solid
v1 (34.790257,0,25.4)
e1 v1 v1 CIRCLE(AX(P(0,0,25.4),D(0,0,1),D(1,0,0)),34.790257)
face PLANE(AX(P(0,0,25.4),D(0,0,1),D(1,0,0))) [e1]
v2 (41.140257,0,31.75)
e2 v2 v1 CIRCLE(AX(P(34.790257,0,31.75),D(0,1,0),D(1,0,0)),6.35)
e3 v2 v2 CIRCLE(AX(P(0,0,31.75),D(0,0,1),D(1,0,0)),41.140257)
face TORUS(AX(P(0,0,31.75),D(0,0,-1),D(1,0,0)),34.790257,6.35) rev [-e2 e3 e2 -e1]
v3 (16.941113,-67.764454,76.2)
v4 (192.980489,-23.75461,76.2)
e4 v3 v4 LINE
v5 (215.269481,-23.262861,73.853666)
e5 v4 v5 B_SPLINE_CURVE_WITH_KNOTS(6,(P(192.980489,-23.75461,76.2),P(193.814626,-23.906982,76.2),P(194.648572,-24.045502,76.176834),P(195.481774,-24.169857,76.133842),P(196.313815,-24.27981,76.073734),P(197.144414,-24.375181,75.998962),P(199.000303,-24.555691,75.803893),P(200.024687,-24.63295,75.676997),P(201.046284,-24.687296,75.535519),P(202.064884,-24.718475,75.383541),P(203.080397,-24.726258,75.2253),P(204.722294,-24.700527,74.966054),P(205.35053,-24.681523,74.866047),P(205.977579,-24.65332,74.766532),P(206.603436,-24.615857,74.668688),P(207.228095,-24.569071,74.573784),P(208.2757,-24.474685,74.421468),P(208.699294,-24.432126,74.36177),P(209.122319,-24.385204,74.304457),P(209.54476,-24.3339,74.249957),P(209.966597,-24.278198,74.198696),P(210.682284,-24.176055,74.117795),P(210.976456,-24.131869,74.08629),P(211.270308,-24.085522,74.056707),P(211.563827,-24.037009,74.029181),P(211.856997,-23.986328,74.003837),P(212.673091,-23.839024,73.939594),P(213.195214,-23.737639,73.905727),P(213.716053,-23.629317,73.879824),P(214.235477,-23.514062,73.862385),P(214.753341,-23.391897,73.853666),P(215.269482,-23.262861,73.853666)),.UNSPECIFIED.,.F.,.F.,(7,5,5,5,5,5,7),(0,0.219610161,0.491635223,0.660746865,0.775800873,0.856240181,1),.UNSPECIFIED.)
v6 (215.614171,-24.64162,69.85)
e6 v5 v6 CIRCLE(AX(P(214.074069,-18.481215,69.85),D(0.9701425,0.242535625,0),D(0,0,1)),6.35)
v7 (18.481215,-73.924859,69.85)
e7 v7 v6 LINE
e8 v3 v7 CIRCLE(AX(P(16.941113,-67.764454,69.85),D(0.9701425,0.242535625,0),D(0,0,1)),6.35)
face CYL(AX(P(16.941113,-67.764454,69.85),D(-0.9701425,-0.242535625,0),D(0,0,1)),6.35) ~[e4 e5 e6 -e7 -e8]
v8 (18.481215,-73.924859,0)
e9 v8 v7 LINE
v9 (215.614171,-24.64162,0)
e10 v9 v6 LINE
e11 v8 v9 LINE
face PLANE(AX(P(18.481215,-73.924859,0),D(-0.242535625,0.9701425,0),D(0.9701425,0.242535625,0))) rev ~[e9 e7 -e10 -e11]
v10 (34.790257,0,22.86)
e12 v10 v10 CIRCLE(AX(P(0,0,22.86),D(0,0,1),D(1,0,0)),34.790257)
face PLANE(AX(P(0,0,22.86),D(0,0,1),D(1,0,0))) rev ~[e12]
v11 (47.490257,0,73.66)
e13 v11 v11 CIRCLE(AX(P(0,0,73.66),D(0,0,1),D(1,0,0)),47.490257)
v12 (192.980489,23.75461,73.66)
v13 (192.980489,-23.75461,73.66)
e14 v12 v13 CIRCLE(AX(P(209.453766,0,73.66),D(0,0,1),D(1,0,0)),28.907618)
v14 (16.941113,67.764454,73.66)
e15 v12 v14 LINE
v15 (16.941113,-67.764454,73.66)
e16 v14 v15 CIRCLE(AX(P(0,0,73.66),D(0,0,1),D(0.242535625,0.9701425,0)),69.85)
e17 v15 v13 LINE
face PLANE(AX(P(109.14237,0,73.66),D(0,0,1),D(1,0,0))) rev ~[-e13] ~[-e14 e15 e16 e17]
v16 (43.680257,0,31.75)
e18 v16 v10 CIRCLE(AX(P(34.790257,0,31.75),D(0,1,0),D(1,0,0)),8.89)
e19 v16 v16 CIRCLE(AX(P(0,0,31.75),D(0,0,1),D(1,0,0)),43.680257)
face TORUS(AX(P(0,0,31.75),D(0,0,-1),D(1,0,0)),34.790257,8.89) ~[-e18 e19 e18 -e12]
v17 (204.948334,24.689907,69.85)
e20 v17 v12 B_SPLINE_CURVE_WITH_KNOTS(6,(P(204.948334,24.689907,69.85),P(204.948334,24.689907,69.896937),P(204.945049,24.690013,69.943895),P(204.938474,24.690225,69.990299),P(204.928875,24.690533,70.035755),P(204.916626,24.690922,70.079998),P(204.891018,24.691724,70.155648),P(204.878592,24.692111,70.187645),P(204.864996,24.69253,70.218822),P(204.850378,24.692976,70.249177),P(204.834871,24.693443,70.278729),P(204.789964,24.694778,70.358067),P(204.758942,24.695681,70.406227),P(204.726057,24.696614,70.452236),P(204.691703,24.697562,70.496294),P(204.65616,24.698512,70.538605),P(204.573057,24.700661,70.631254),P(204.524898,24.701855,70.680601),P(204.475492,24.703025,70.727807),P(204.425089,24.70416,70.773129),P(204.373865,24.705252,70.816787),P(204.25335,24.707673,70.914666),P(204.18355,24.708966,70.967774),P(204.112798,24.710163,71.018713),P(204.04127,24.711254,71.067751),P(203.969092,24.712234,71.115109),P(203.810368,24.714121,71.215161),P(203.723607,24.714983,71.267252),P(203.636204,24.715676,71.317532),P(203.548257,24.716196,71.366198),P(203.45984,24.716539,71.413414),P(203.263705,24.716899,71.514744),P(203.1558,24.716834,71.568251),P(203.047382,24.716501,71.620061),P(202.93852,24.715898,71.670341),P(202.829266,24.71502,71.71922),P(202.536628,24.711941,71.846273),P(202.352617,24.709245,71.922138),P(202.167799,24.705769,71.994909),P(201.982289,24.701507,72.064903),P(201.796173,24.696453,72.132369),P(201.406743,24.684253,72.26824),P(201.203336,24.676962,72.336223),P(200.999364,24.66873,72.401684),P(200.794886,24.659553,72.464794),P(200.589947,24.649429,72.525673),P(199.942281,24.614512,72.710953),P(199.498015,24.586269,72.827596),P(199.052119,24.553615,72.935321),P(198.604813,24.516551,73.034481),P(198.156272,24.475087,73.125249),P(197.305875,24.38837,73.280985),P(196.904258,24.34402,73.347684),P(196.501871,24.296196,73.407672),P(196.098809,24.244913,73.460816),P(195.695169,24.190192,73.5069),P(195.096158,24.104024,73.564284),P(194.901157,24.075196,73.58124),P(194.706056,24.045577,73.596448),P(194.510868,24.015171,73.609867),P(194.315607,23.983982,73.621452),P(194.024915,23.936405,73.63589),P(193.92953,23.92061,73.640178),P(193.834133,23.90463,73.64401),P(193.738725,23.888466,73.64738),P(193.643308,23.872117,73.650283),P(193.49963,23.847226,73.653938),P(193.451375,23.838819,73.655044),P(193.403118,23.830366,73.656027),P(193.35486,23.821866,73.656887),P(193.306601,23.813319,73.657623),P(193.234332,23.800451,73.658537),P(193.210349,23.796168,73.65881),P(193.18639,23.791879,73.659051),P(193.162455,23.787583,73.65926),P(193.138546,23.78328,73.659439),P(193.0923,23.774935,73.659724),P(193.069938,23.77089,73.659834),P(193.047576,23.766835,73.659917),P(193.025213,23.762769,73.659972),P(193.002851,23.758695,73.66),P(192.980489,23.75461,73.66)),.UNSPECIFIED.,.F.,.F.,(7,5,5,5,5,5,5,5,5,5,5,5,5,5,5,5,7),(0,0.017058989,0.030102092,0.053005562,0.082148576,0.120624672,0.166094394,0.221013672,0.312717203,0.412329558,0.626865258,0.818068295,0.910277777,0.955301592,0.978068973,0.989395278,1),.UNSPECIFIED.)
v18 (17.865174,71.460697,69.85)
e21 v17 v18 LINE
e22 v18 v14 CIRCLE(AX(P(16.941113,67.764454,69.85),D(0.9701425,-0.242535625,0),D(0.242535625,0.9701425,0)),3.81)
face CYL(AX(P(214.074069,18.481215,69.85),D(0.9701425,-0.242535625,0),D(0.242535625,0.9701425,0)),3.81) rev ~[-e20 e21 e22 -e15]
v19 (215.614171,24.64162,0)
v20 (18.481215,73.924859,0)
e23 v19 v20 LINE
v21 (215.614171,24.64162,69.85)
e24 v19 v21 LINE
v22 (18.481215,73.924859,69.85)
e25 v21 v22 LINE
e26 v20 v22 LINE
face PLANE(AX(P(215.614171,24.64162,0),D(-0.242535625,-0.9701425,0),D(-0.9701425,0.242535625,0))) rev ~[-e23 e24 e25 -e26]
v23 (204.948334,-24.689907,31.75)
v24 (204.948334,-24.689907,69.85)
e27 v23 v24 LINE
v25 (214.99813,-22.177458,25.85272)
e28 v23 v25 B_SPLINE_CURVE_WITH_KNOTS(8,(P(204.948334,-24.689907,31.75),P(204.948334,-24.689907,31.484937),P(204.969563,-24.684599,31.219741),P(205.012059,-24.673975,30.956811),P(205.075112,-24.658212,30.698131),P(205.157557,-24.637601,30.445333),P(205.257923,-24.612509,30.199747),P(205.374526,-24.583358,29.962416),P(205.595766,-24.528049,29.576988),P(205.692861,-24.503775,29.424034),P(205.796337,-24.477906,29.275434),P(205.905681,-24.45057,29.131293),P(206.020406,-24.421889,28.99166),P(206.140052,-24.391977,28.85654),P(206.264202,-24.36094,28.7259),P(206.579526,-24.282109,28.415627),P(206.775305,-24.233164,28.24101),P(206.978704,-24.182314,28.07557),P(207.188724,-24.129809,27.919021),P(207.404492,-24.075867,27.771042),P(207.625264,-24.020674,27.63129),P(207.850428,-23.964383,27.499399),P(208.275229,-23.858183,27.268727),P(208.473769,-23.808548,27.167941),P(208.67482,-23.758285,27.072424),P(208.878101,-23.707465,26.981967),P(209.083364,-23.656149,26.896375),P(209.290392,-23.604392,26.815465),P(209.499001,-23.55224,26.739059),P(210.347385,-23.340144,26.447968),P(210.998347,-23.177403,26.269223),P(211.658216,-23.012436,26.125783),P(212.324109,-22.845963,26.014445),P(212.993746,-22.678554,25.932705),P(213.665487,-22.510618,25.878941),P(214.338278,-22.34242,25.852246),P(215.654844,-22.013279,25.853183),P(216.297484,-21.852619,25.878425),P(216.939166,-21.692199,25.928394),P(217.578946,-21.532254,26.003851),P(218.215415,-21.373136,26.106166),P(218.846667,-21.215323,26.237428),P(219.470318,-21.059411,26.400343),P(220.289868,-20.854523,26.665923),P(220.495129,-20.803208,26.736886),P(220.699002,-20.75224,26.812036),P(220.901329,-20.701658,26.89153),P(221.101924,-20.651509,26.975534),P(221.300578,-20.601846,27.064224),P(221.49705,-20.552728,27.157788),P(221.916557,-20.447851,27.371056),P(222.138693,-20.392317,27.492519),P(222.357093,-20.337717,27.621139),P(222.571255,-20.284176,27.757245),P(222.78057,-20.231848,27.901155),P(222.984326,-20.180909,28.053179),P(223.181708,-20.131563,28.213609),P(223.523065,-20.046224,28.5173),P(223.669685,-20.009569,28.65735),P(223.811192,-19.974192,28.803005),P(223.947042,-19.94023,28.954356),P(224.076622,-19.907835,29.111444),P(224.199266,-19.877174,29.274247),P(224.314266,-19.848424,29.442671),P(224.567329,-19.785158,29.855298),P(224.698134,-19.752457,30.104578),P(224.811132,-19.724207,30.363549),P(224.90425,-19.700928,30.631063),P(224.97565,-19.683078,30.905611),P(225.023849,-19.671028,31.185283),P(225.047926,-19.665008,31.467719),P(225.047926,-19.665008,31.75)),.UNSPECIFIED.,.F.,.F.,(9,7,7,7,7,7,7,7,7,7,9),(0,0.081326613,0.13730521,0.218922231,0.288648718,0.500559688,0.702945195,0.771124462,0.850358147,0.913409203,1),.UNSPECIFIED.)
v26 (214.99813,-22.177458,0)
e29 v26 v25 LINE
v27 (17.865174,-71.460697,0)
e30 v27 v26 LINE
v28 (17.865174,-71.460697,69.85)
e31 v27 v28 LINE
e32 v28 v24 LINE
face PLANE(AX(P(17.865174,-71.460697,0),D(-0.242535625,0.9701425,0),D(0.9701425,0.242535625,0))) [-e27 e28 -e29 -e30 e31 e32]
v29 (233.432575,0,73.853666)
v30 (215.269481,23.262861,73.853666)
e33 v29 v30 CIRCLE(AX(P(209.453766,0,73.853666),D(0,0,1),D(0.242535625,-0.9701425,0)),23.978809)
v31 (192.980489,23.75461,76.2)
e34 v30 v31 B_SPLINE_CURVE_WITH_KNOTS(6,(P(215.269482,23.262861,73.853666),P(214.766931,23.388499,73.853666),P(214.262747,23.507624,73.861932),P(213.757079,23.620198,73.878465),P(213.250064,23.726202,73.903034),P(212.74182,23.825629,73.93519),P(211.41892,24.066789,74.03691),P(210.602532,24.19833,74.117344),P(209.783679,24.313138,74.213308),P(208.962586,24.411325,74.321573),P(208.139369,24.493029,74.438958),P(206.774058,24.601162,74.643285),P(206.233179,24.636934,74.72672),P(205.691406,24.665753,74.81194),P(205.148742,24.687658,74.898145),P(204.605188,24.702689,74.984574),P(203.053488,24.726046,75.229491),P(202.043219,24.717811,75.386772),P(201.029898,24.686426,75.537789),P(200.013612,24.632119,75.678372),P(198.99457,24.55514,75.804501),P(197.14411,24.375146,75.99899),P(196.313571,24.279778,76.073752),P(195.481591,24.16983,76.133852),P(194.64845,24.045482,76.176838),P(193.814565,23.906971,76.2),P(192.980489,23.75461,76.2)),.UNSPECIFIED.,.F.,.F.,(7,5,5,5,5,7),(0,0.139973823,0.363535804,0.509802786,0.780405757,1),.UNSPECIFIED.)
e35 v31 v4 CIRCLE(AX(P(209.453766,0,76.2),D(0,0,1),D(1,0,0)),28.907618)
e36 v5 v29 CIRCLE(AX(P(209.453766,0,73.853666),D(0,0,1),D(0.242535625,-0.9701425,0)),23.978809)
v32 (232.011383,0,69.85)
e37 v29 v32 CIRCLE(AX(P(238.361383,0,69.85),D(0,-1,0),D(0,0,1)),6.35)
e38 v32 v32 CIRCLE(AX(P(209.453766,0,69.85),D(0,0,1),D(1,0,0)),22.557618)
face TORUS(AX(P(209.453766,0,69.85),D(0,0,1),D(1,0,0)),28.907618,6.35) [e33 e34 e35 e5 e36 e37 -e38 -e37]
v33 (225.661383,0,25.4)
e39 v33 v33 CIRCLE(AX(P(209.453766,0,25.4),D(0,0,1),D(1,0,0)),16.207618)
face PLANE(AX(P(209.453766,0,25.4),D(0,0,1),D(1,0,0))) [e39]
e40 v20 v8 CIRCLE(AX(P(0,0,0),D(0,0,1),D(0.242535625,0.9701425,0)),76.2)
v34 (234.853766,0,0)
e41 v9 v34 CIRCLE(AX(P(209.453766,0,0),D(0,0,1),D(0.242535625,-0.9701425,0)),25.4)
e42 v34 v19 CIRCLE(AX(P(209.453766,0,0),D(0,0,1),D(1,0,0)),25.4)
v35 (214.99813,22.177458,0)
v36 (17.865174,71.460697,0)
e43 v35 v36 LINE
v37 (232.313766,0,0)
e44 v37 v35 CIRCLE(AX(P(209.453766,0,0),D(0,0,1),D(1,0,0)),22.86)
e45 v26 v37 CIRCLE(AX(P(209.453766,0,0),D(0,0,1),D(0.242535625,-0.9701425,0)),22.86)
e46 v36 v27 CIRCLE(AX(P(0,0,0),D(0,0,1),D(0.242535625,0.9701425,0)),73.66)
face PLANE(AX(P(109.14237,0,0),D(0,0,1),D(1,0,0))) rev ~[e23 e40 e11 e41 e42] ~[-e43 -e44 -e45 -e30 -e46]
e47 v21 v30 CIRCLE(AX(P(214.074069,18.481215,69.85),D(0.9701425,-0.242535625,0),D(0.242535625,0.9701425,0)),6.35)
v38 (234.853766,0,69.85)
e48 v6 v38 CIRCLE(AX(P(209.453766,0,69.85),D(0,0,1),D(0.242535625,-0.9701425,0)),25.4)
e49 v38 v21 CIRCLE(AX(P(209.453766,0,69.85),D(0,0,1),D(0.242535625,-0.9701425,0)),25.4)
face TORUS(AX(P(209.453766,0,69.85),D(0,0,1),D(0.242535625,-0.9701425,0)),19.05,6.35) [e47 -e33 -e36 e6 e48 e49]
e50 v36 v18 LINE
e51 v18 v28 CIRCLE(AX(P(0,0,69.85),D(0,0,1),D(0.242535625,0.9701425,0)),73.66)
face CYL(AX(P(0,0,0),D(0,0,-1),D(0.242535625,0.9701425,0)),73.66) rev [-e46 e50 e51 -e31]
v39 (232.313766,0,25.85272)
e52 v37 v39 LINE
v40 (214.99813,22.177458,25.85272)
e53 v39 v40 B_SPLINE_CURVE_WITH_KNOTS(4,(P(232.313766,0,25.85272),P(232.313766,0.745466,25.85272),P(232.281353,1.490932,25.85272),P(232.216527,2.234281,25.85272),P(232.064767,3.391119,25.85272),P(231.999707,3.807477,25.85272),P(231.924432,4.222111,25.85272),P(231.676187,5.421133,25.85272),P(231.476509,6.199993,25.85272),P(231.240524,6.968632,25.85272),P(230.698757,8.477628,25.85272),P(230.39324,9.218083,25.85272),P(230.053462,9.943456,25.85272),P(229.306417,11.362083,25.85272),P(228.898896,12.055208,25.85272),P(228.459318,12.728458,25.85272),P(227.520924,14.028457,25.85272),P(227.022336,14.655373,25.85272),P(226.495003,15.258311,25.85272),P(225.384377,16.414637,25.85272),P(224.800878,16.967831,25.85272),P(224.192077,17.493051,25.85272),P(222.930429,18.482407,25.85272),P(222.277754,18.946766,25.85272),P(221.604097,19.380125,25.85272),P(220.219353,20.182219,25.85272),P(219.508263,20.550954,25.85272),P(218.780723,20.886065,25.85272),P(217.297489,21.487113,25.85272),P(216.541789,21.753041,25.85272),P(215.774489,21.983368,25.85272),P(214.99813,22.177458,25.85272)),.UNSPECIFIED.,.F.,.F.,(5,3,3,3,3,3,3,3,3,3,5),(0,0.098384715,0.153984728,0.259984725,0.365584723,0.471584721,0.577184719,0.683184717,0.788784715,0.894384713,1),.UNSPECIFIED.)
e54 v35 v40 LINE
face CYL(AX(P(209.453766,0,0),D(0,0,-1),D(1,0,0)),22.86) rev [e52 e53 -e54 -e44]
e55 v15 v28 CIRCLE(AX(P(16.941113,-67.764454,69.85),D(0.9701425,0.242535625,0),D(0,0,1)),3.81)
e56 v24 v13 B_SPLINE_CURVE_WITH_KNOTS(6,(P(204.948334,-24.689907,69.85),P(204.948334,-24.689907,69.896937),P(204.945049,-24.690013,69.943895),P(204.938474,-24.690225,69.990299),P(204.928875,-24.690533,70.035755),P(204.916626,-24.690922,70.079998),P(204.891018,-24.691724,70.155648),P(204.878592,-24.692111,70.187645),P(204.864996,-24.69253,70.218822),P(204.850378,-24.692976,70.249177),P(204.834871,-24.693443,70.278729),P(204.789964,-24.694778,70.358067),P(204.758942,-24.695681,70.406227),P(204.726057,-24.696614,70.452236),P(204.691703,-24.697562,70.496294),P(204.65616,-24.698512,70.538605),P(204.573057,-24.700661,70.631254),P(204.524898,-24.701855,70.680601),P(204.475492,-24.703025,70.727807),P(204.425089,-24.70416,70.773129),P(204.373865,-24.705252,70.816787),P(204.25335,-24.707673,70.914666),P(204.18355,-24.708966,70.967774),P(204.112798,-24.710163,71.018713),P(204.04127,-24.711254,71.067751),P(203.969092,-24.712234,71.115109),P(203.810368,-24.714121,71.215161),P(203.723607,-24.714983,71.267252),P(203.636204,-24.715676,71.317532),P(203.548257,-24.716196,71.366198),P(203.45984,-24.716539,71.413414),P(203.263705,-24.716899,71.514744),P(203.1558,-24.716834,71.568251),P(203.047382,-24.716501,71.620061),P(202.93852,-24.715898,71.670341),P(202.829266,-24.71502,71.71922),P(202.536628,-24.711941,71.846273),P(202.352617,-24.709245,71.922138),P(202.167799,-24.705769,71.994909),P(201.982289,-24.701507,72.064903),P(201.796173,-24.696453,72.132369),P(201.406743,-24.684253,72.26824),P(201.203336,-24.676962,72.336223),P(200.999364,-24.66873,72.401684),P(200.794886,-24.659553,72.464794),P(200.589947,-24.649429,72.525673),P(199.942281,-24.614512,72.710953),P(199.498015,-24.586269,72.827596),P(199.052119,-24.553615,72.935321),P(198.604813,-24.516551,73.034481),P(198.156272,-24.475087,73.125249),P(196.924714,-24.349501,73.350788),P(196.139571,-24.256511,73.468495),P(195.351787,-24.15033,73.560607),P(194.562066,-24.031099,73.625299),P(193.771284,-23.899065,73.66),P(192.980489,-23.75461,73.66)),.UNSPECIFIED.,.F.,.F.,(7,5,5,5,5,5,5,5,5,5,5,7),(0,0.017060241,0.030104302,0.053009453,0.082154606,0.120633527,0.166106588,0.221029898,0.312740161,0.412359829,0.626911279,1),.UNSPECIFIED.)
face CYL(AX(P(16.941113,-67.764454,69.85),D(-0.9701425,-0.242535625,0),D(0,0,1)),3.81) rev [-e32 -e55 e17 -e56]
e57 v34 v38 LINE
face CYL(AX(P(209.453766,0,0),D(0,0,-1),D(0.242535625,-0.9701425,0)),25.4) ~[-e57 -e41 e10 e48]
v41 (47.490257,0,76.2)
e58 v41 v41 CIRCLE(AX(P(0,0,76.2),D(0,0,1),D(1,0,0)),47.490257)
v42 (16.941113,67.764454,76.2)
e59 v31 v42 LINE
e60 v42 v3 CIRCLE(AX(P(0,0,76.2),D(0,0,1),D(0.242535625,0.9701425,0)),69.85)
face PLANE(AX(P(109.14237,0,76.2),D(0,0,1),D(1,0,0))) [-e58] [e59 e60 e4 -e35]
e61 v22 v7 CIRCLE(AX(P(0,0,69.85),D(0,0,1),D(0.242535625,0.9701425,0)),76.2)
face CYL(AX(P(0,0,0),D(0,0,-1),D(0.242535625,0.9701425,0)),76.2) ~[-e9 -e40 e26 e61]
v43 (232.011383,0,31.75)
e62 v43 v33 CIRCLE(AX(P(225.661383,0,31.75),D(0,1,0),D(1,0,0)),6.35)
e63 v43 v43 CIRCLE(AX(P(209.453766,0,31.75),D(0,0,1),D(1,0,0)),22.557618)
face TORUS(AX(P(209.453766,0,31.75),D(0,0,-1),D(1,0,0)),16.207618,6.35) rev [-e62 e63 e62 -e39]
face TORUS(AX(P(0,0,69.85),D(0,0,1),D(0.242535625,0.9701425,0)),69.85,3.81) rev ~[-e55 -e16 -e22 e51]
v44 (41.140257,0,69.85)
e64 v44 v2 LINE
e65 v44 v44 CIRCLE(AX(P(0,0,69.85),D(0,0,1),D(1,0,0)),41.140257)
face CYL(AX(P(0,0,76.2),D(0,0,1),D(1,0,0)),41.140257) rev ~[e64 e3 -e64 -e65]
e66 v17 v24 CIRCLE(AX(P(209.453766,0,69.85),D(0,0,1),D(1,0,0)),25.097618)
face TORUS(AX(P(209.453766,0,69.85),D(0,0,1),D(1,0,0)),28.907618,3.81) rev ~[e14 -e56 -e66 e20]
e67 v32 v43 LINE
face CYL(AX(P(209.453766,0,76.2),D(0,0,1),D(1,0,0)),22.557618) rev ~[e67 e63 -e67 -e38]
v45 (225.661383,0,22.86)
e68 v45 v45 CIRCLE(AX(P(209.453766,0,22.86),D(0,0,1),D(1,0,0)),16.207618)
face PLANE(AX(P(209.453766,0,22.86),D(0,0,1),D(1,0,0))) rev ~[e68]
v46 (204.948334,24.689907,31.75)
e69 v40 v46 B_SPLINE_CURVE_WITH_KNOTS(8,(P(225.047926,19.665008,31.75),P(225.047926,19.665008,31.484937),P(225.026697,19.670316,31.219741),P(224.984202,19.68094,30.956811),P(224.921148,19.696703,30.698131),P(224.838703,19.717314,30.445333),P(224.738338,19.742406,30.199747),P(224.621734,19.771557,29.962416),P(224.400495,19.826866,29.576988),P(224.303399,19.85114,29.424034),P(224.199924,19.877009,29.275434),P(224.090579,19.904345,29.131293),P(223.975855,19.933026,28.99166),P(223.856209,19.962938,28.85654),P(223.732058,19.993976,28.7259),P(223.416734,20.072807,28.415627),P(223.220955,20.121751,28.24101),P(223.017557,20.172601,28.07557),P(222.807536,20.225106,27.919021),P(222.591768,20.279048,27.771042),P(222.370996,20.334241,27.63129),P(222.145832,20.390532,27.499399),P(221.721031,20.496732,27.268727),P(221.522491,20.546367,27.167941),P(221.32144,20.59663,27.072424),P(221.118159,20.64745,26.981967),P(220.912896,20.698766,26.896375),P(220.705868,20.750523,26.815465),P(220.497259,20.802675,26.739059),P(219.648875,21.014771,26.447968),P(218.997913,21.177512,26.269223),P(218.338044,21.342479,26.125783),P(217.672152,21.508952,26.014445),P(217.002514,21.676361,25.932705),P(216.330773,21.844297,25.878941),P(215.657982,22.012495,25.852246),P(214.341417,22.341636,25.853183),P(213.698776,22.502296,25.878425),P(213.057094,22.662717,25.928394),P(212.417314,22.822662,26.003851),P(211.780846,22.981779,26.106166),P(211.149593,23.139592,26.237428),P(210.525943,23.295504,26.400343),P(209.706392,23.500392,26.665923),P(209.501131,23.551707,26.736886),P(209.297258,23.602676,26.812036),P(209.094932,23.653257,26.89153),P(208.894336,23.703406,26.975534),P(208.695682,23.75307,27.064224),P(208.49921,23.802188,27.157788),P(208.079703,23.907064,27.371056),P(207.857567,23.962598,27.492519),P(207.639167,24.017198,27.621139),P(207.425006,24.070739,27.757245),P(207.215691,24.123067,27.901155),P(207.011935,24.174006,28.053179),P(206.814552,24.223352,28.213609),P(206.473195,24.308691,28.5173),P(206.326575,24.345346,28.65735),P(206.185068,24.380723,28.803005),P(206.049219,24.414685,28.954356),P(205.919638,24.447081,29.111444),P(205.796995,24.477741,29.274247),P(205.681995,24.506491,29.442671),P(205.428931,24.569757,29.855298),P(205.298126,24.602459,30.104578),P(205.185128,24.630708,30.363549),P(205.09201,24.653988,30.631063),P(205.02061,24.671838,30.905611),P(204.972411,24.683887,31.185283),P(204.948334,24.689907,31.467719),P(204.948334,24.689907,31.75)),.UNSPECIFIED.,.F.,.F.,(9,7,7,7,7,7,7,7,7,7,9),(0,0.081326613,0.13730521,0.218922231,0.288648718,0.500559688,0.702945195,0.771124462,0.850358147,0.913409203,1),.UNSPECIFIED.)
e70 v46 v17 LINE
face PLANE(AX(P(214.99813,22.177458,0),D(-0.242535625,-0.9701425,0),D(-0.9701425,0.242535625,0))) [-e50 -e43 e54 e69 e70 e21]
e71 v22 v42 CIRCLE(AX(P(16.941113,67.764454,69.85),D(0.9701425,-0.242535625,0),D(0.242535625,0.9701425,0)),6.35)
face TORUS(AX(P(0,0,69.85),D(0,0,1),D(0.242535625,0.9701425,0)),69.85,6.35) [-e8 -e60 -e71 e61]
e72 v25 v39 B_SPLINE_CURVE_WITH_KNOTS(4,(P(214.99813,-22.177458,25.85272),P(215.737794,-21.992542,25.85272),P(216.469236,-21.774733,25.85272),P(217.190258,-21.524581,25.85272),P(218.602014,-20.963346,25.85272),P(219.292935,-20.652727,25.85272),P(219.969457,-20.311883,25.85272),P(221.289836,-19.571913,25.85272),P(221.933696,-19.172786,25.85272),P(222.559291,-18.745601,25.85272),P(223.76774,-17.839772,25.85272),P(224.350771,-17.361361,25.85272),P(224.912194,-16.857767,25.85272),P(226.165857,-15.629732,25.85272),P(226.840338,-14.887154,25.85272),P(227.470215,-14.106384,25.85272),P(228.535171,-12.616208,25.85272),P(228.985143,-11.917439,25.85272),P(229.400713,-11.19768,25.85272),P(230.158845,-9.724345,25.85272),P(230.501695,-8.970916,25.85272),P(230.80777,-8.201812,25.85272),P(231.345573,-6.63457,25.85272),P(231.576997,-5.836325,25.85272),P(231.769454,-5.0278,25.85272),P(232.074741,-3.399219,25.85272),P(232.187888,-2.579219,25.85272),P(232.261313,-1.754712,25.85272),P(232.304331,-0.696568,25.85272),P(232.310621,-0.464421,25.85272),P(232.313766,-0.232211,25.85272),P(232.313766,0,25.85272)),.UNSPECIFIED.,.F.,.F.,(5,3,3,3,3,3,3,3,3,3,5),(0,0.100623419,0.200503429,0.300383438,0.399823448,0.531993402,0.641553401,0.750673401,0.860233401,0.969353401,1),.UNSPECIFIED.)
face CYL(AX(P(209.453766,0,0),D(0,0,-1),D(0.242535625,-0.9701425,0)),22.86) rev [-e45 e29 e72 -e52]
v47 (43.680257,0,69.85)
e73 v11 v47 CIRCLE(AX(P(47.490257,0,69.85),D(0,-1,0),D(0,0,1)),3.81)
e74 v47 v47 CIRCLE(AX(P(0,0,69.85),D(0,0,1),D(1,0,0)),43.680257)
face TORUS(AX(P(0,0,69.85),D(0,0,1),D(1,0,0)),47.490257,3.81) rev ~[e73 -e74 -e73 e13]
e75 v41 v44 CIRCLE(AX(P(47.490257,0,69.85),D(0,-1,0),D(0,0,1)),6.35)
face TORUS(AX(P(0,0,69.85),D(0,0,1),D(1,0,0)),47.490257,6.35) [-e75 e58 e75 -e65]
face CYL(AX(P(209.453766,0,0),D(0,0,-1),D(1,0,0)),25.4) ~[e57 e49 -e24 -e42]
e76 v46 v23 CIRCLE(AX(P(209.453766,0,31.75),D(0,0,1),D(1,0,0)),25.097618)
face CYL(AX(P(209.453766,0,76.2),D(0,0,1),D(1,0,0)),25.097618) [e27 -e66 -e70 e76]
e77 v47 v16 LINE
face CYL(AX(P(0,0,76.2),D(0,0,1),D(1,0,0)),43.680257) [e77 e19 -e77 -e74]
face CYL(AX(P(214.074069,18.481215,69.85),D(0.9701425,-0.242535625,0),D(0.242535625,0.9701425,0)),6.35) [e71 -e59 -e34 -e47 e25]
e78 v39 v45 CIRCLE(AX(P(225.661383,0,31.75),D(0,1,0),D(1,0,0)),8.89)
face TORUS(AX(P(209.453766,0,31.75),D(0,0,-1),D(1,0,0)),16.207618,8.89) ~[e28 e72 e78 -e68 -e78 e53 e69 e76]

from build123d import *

# Parameters (mm, degrees)
F1_DEPTH     = 76.2
F2_R         = 22.557617544
F2_R_2       = 41.140256543
F3_DEPTH     = 50.8
F4_T5_DEPTH  = 203.2
F4_T7_DEPTH  = 203.2
F4_T10_ANGLE = 151.9275130641
F4_T12_ANGLE = 208.0724869359
F5_T         = -2.54


# Not quite as in the source:
# - a fillet or chamfer that OpenCascade refuses, or shapes differently, is made with other operations: its cross-section is extruded or revolved along the edge and cut away or added


with BuildPart() as f1:
    # F0 (on Top) → F1 (new body)
    with BuildSketch(Plane.XY):
        with BuildLine():
            ThreePointArc((18.4812146278, 73.9248585111), (60.0612543768, 46.8944103565), (76.2, 0))
            ThreePointArc((76.2, 0), (60.0612543768, -46.8944103565), (18.4812146278, -73.9248585111))
            Line((18.4812146278, -73.9248585111), (215.6141706573, -24.6416195037))
            ThreePointArc((215.6141706573, -24.6416195037), (184.0537657814, 0), (215.6141706573, 24.6416195037))
            Line((215.6141706573, 24.6416195037), (18.4812146278, 73.9248585111))
        make_face()
        with BuildLine():
            ThreePointArc((18.4812146278, -73.9248585111), (60.0612543768, -46.8944103565), (76.2, 0))
            ThreePointArc((76.2, 0), (60.0612543768, 46.8944103565), (18.4812146278, 73.9248585111))
            ThreePointArc((18.4812146278, 73.9248585111), (-76.2, 0), (18.4812146278, -73.9248585111))
        make_face()
        with BuildLine():
            ThreePointArc((234.8537657814, 0), (229.474183907, 15.6314701188), (215.6141706573, 24.6416195037))
            ThreePointArc((215.6141706573, 24.6416195037), (184.0537657814, 0), (215.6141706573, -24.6416195037))
            ThreePointArc((215.6141706573, -24.6416195037), (229.474183907, -15.6314701188), (234.8537657814, 0))
        make_face()
    extrude(amount=F1_DEPTH)

    # F2 (on face) → F3 (cut)
    with BuildSketch(Plane.XY.offset(76.2)):
        with Locations((209.4537657814, 0)):
            Circle(F2_R)
        Circle(F2_R_2)
    extrude(amount=-F3_DEPTH, mode=Mode.SUBTRACT)

    # F4: fillet of radius 6.35 on 8 edges, made by hand

    # F4_s1 → F4_t2 (revolve)
    with BuildSketch(Plane.XZ):
        with BuildLine():
            ThreePointArc((41.140256543, 31.75), (39.2803846036, 27.2598719395), (34.790256543, 25.4))
            Line((34.790256543, 25.4), (41.140256543, 25.4))
            Line((41.140256543, 25.4), (41.140256543, 31.75))
        make_face()
    revolve(axis=Axis((0, 0, 25.4), (0, 0, 1)))

    # F4_s3 → F4_t4 (revolve)
    with BuildSketch(Plane.XZ):
        with BuildLine():
            ThreePointArc((232.0113833254, 31.75), (230.151511386, 27.2598719395), (225.6613833254, 25.4))
            Line((225.6613833254, 25.4), (232.0113833254, 25.4))
            Line((232.0113833254, 25.4), (232.0113833254, 31.75))
        make_face()
    revolve(axis=Axis((209.4537657814, 0, 25.4), (0, 0, 1)))

    # F4_s6 → F4_t5 (cut)
    with BuildSketch(Plane(origin=(0, 0, 0), x_dir=(0, 0, 1), z_dir=(0.9701425001, 0.242535625, 0))):
        with BuildLine():
            ThreePointArc((76.2, 69.85), (74.3401280605, 74.3401280605), (69.85, 76.2))
            Line((69.85, 76.2), (76.2, 76.2))
            Line((76.2, 76.2), (76.2, 69.85))
        make_face()
    extrude(amount=F4_T5_DEPTH, mode=Mode.SUBTRACT)

    # F4_s8 → F4_t7 (cut)
    with BuildSketch(Plane(origin=(197.1329560295, -49.2832390074, 0), x_dir=(0, 0, 1), z_dir=(-0.9701425001, 0.242535625, 0))):
        with BuildLine():
            ThreePointArc((69.85, 76.2), (74.3401280605, 74.3401280605), (76.2, 69.85))
            Line((76.2, 69.85), (76.2, 76.2))
            Line((76.2, 76.2), (69.85, 76.2))
        make_face()
    extrude(amount=F4_T7_DEPTH, mode=Mode.SUBTRACT)

    # F4_s9 → F4_t10 (revolve, cut)
    with BuildSketch(Plane(origin=(197.1329560295, 49.2832390074, 0), x_dir=(0, 0, 1), z_dir=(-0.9701425001, -0.242535625, 0))):
        with BuildLine():
            ThreePointArc((69.85, -76.2), (74.3401280605, -74.3401280605), (76.2, -69.85))
            Line((76.2, -69.85), (76.2, -76.2))
            Line((76.2, -76.2), (69.85, -76.2))
        make_face()
    revolve(axis=Axis((209.4537657814, 0, 76.2), (0, 0, 1)), revolution_arc=F4_T10_ANGLE, mode=Mode.SUBTRACT)

    # F4_s11 → F4_t12 (revolve, cut)
    with BuildSketch(Plane(origin=(0, 0, 0), x_dir=(0, 0, 1), z_dir=(0.9701425001, -0.242535625, 0))):
        with BuildLine():
            ThreePointArc((69.85, -76.2), (74.3401280605, -74.3401280605), (76.2, -69.85))
            Line((76.2, -69.85), (76.2, -76.2))
            Line((76.2, -76.2), (69.85, -76.2))
        make_face()
    revolve(axis=Axis((0, 0, 76.2), (0, 0, 1)), revolution_arc=F4_T12_ANGLE, mode=Mode.SUBTRACT)

    # F4_s13 → F4_t14 (revolve, cut)
    with BuildSketch(Plane.XZ):
        with BuildLine():
            ThreePointArc((238.3613833254, 76.2), (233.8712552649, 74.3401280605), (232.0113833254, 69.85))
            Line((232.0113833254, 69.85), (232.0113833254, 76.2))
            Line((232.0113833254, 76.2), (238.3613833254, 76.2))
        make_face()
    revolve(axis=Axis((209.4537657814, 0, 76.2), (0, 0, 1)), mode=Mode.SUBTRACT)

    # F4_s15 → F4_t16 (revolve, cut)
    with BuildSketch(Plane.XZ):
        with BuildLine():
            ThreePointArc((47.490256543, 76.2), (43.0001284825, 74.3401280605), (41.140256543, 69.85))
            Line((41.140256543, 69.85), (41.140256543, 76.2))
            Line((41.140256543, 76.2), (47.490256543, 76.2))
        make_face()
    revolve(axis=Axis((0, 0, 76.2), (0, 0, 1)), mode=Mode.SUBTRACT)

    # F5
    f5_openings = [f1.faces().sort_by_distance(p)[0] for p in [
        (57.51924, 0, 0),
    ]]
    offset(amount=F5_T, openings=f5_openings)


solid = f1.part
